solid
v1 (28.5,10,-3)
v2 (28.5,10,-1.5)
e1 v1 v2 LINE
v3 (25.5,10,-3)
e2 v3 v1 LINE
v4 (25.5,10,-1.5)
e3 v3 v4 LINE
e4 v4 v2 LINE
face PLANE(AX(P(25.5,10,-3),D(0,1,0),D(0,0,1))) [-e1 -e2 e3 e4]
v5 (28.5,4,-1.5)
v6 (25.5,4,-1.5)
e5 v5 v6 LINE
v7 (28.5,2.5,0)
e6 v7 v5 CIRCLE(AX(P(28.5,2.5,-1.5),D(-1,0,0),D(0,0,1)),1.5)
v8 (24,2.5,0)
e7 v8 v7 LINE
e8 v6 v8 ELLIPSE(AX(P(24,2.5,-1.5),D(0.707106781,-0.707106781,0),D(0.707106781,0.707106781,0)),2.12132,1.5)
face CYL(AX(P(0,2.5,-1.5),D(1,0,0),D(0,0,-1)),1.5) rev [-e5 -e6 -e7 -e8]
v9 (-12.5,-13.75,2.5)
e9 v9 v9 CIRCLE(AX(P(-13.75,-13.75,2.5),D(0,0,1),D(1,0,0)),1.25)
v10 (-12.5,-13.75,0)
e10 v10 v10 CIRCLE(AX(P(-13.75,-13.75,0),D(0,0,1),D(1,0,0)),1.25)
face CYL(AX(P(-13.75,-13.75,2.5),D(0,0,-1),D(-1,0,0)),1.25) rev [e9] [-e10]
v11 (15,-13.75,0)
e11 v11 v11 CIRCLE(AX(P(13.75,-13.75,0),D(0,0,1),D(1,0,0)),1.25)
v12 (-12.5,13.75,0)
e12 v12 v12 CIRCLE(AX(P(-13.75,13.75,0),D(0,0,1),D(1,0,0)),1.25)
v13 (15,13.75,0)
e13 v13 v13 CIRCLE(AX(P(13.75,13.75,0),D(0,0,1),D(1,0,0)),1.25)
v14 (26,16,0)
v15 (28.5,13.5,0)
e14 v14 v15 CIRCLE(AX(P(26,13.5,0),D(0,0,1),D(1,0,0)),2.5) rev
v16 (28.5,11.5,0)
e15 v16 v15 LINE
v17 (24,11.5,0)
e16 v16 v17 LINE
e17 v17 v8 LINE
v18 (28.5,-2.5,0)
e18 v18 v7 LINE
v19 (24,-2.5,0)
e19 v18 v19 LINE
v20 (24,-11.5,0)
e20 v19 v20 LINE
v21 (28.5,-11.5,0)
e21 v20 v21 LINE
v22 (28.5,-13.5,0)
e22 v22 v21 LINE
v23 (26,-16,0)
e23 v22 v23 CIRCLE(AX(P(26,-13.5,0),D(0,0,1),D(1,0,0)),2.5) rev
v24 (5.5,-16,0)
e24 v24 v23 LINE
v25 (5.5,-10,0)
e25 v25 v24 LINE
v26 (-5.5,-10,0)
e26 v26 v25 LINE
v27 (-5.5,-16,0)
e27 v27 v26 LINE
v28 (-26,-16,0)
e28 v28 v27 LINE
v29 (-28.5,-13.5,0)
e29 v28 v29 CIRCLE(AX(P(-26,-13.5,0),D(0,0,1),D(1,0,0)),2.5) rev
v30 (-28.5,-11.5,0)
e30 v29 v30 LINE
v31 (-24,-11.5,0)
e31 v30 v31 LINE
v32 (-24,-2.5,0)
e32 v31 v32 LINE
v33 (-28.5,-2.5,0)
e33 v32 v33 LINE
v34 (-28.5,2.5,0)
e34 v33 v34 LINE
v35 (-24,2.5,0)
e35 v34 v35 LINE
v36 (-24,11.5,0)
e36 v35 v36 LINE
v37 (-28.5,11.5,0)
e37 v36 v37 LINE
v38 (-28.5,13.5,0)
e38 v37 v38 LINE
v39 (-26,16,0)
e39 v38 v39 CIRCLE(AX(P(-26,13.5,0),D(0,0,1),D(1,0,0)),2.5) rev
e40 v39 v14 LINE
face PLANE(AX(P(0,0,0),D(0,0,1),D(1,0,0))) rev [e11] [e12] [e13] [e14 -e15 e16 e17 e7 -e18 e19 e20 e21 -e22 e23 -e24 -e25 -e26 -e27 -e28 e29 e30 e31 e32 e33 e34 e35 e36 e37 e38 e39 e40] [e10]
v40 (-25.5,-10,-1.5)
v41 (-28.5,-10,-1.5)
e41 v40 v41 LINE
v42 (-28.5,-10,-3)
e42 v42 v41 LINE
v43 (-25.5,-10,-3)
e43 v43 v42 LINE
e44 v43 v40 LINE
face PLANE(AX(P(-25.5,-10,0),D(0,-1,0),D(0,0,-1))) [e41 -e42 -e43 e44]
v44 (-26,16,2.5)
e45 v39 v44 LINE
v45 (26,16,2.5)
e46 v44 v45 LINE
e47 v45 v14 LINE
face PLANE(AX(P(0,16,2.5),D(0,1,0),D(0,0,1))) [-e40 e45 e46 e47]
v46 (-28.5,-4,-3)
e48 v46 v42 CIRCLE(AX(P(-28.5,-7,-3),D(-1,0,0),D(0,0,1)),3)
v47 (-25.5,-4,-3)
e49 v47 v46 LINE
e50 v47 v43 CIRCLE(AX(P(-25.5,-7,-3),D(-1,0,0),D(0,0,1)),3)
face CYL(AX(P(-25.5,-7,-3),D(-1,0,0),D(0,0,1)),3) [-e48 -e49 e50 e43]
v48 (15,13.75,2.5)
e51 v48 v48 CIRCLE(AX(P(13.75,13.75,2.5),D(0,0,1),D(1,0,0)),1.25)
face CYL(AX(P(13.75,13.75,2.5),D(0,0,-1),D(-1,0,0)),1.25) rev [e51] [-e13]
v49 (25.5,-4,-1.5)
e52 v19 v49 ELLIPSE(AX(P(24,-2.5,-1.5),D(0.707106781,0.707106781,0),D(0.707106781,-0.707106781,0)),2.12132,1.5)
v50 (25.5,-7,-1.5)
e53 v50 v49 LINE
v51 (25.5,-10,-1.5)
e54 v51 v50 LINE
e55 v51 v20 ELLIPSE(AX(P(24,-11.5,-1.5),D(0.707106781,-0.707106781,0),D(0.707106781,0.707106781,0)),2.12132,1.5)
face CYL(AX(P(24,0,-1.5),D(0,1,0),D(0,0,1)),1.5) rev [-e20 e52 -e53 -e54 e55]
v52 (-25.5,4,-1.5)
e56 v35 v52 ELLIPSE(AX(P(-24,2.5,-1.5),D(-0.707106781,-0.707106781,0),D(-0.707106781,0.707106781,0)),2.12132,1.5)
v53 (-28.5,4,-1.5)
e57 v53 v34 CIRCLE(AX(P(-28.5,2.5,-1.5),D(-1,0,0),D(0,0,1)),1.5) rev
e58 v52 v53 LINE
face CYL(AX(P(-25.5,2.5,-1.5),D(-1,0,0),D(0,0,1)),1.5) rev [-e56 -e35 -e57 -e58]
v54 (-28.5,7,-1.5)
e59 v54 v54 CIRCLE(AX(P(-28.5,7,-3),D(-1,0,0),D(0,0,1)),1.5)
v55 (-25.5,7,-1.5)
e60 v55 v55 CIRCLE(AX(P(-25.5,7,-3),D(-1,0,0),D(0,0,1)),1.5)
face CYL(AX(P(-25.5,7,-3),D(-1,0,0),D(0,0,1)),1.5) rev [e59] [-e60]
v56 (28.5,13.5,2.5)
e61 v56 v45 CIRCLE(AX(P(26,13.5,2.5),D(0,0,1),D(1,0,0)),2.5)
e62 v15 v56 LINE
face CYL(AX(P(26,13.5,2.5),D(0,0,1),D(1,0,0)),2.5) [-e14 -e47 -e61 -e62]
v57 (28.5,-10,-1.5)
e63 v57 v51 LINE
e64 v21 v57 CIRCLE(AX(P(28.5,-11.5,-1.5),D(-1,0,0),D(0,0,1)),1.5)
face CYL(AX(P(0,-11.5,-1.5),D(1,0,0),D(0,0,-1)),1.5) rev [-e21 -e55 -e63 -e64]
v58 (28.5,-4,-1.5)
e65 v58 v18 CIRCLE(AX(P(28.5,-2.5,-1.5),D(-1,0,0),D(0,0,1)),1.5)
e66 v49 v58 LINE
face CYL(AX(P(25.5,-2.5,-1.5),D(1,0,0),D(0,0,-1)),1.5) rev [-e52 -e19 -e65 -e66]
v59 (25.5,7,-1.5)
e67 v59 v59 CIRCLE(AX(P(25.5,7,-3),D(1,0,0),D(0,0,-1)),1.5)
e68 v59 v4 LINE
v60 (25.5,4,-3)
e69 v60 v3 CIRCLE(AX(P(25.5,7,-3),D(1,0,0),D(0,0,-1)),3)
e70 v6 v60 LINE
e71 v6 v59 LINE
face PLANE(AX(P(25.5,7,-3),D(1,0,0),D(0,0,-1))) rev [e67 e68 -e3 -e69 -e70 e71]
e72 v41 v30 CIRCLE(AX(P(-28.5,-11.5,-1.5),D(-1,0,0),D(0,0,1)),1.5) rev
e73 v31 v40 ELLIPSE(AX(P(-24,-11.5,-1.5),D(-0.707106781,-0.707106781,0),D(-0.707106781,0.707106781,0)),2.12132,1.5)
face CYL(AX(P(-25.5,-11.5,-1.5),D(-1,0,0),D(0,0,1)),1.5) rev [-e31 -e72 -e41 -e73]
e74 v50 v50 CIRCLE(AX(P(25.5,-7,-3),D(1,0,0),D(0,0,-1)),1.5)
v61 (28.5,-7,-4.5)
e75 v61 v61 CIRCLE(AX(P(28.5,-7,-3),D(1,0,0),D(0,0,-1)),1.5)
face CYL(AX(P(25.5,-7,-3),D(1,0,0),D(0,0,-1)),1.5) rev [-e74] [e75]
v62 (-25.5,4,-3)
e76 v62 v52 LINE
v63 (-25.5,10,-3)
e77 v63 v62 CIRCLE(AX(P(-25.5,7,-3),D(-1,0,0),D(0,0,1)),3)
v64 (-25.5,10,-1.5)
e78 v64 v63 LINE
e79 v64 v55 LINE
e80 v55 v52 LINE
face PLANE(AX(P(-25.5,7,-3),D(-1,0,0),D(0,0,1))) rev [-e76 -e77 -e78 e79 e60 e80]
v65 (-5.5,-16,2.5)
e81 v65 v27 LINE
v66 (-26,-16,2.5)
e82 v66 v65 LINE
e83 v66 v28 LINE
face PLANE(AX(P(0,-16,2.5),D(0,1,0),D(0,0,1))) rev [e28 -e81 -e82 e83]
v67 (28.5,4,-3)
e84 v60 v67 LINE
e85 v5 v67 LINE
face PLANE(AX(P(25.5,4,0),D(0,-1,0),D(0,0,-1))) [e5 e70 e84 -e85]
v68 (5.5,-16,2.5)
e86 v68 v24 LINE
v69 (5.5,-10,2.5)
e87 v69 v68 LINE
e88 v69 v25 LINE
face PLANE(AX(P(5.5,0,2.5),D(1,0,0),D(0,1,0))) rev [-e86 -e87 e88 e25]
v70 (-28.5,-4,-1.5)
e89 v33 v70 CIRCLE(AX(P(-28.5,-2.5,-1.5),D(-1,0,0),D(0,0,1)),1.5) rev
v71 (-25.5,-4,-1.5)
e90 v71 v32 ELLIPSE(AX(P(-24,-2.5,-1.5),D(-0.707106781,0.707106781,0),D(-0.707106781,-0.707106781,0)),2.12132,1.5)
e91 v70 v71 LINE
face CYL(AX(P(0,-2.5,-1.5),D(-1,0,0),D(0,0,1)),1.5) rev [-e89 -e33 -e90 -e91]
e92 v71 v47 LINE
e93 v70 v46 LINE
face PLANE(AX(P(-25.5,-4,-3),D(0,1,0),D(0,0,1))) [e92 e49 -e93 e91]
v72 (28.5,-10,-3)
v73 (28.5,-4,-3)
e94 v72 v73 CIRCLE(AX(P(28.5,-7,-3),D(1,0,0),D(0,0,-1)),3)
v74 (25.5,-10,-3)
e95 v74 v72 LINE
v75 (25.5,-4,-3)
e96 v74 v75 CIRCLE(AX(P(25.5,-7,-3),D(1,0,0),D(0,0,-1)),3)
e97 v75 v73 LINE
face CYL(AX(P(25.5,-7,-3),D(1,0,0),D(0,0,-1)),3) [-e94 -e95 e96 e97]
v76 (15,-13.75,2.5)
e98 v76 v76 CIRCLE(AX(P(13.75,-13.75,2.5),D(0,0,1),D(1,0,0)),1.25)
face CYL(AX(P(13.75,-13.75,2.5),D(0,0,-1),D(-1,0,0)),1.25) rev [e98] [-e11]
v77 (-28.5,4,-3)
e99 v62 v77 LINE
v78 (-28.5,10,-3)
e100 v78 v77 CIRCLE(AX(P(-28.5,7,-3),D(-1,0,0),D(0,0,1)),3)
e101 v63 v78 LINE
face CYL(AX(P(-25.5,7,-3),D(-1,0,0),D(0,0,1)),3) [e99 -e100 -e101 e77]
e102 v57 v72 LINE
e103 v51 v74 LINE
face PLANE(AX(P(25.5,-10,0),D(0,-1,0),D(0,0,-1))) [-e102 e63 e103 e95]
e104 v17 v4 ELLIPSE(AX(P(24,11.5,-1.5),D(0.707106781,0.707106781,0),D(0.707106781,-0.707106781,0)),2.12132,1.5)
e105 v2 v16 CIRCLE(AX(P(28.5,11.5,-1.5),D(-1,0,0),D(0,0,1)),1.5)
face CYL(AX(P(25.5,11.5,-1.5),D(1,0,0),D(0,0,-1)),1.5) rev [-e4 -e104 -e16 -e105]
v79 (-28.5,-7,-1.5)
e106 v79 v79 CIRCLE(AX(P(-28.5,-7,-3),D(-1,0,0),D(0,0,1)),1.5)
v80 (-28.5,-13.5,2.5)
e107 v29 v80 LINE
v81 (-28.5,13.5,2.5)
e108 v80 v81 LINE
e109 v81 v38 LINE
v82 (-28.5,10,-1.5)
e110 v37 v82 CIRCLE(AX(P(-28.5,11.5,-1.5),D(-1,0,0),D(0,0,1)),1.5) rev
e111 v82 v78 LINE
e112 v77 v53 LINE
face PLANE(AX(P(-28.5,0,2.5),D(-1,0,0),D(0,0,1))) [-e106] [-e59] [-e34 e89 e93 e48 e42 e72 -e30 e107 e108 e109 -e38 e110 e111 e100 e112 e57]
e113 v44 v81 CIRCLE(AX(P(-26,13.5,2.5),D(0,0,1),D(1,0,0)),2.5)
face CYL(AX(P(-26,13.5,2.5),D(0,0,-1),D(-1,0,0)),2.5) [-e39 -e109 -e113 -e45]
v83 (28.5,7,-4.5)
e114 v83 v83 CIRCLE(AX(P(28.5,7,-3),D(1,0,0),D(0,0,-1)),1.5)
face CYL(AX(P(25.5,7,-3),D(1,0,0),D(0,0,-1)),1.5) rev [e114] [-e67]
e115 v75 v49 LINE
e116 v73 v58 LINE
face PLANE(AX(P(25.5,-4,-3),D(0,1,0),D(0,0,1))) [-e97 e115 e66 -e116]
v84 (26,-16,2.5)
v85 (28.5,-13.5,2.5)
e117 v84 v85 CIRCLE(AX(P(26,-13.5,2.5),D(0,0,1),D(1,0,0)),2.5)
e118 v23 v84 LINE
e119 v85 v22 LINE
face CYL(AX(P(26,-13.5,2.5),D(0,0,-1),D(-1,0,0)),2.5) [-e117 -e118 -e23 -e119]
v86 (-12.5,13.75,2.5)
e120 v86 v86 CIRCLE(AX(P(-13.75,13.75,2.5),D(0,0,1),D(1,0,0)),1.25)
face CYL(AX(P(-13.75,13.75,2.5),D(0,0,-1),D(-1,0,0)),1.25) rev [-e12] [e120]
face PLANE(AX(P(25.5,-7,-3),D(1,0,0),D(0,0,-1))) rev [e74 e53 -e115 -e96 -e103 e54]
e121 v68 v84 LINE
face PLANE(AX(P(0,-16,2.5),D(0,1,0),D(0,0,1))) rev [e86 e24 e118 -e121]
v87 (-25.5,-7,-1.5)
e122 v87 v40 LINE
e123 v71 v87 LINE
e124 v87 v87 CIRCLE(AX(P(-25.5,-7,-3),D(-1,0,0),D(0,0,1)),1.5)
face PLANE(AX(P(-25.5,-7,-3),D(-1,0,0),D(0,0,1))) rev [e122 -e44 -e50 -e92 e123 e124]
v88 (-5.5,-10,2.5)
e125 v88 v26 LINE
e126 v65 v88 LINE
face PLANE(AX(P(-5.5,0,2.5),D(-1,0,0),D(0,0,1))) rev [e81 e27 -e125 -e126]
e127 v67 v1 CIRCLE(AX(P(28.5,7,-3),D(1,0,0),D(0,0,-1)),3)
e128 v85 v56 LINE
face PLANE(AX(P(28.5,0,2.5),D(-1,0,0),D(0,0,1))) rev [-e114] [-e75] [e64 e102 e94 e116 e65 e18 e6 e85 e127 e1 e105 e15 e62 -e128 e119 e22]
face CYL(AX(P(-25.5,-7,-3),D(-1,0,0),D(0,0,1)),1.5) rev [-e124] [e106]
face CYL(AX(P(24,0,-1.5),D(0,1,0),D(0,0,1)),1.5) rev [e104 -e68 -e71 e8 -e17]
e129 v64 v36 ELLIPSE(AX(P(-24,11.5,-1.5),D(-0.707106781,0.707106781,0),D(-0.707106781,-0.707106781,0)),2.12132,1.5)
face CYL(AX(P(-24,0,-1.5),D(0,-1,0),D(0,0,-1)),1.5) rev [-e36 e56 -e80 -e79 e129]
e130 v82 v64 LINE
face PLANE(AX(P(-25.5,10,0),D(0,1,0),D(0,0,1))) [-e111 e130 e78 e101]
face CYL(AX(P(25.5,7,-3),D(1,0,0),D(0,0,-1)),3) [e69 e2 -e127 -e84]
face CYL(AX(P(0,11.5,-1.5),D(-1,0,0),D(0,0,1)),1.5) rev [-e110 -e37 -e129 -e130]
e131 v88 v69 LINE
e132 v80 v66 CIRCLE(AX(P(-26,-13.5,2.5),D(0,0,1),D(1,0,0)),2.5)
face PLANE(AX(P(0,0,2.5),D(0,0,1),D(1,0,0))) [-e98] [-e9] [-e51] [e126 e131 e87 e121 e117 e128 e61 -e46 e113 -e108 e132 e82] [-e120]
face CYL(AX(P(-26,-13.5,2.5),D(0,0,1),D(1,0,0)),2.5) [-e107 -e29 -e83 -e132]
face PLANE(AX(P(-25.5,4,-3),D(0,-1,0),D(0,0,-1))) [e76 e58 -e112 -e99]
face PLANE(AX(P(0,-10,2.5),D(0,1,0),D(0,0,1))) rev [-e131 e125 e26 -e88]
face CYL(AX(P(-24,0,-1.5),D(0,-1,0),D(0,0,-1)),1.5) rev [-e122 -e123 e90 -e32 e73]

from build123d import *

# Parameters (mm, degrees)
SKETCH_1_R      = 1.25
EXTRUDE_1_DEPTH = 2.5
SKETCH_3_R      = 1.5
EXTRUDE_2_DEPTH = 3
EXTRUDE_START   = -3
SKETCH_4_R      = 1.5
EXTRUDE_3_DEPTH = 3
FILLET_1_R      = 1.5
FILLET_2_R      = 2.5


with BuildPart() as part:
    # 草图1 → 凸台-拉伸1 (new body)
    with BuildSketch(Plane.XY):
        Polygon((-28.5, -16), (-16, -16), (-5.5, -16), (-5.5, -10), (0, -10), (5.5, -10), (5.5, -16), (16, -16), (28.5, -16), (28.5, 16), (16, 16), (-16, 16), (-28.5, 16), align=None)
        with Locations((-13.75, -13.75)):
            Circle(SKETCH_1_R, mode=Mode.SUBTRACT)
        with Locations((13.75, -13.75)):
            Circle(SKETCH_1_R, mode=Mode.SUBTRACT)
        with Locations((-13.75, 13.75)):
            Circle(SKETCH_1_R, mode=Mode.SUBTRACT)
        with Locations((13.75, 13.75)):
            Circle(SKETCH_1_R, mode=Mode.SUBTRACT)
    extrude(amount=EXTRUDE_1_DEPTH)

    # 草图3 → 凸台-拉伸2 (add)
    # profile 1 of 2: a face of its own
    with BuildSketch(Plane.ZY.offset(28.5)):
        with BuildLine():
            Line((-3, 4), (0, 4))
            Line((0, 4), (0, 10))
            Line((0, 10), (-3, 10))
            ThreePointArc((-3, 10), (-6, 7), (-3, 4))
        make_face()
        with Locations((-3, 7)):
            Circle(SKETCH_3_R, mode=Mode.SUBTRACT)
    # profile 2 of 2: a face of its own
    with BuildSketch(Plane.ZY.offset(28.5)):
        with BuildLine():
            Line((-3, -4), (0, -4))
            Line((0, -4), (0, -10))
            Line((0, -10), (-3, -10))
            ThreePointArc((-3, -10), (-6, -7), (-3, -4))
        make_face()
        with Locations((-3, -7)):
            Circle(SKETCH_3_R, mode=Mode.SUBTRACT)
    extrude(amount=-EXTRUDE_2_DEPTH)

    # 草图4 → 凸台-拉伸3 (add)
    # profile 1 of 2: a face of its own
    with BuildSketch(Plane(origin=(28.5, 0, 0), x_dir=(0, 0, -1), z_dir=(1, 0, 0)).offset(EXTRUDE_START)):
        with BuildLine():
            Line((3, -4), (0, -4))
            Line((0, -4), (0, -10))
            Line((0, -10), (3, -10))
            ThreePointArc((3, -10), (6, -7), (3, -4))
        make_face()
        with Locations(Location((3, -7, 0), (0, 0, 180))):
            Circle(SKETCH_4_R, mode=Mode.SUBTRACT)
    # profile 2 of 2: a face of its own
    with BuildSketch(Plane(origin=(28.5, 0, 0), x_dir=(0, 0, -1), z_dir=(1, 0, 0)).offset(EXTRUDE_START)):
        with BuildLine():
            Line((3, 10), (0, 10))
            Line((0, 10), (0, 4))
            Line((0, 4), (3, 4))
            ThreePointArc((3, 4), (6, 7), (3, 10))
        make_face()
        with Locations(Location((3, 7, 0), (0, 0, 180))):
            Circle(SKETCH_4_R, mode=Mode.SUBTRACT)
    extrude(amount=EXTRUDE_3_DEPTH)

    # 圆角1
    fillet_1_edges = [part.edges().sort_by_distance(p)[0] for p in [
        (-25.5, 7, 0),
        (-27, 10, 0),
        (-27, 4, 0),
        (-25.5, -7, 0),
        (-27, -4, 0),
        (-27, -10, 0),
        (25.5, -7, 0),
        (27, -10, 0),
        (27, -4, 0),
        (25.5, 7, 0),
        (27, 4, 0),
        (27, 10, 0),
    ]]
    fillet(fillet_1_edges, radius=FILLET_1_R - 0.0001)  # a hair under: the kernel refuses the full size

    # 圆角2
    fillet_2_edges = [part.edges().sort_by_distance(p)[0] for p in [
        (-28.5, -16, 1.25),
        (-28.5, 16, 1.25),
        (28.5, 16, 1.25),
        (28.5, -16, 1.25),
    ]]
    fillet(fillet_2_edges, radius=FILLET_2_R)


solid = part.part
